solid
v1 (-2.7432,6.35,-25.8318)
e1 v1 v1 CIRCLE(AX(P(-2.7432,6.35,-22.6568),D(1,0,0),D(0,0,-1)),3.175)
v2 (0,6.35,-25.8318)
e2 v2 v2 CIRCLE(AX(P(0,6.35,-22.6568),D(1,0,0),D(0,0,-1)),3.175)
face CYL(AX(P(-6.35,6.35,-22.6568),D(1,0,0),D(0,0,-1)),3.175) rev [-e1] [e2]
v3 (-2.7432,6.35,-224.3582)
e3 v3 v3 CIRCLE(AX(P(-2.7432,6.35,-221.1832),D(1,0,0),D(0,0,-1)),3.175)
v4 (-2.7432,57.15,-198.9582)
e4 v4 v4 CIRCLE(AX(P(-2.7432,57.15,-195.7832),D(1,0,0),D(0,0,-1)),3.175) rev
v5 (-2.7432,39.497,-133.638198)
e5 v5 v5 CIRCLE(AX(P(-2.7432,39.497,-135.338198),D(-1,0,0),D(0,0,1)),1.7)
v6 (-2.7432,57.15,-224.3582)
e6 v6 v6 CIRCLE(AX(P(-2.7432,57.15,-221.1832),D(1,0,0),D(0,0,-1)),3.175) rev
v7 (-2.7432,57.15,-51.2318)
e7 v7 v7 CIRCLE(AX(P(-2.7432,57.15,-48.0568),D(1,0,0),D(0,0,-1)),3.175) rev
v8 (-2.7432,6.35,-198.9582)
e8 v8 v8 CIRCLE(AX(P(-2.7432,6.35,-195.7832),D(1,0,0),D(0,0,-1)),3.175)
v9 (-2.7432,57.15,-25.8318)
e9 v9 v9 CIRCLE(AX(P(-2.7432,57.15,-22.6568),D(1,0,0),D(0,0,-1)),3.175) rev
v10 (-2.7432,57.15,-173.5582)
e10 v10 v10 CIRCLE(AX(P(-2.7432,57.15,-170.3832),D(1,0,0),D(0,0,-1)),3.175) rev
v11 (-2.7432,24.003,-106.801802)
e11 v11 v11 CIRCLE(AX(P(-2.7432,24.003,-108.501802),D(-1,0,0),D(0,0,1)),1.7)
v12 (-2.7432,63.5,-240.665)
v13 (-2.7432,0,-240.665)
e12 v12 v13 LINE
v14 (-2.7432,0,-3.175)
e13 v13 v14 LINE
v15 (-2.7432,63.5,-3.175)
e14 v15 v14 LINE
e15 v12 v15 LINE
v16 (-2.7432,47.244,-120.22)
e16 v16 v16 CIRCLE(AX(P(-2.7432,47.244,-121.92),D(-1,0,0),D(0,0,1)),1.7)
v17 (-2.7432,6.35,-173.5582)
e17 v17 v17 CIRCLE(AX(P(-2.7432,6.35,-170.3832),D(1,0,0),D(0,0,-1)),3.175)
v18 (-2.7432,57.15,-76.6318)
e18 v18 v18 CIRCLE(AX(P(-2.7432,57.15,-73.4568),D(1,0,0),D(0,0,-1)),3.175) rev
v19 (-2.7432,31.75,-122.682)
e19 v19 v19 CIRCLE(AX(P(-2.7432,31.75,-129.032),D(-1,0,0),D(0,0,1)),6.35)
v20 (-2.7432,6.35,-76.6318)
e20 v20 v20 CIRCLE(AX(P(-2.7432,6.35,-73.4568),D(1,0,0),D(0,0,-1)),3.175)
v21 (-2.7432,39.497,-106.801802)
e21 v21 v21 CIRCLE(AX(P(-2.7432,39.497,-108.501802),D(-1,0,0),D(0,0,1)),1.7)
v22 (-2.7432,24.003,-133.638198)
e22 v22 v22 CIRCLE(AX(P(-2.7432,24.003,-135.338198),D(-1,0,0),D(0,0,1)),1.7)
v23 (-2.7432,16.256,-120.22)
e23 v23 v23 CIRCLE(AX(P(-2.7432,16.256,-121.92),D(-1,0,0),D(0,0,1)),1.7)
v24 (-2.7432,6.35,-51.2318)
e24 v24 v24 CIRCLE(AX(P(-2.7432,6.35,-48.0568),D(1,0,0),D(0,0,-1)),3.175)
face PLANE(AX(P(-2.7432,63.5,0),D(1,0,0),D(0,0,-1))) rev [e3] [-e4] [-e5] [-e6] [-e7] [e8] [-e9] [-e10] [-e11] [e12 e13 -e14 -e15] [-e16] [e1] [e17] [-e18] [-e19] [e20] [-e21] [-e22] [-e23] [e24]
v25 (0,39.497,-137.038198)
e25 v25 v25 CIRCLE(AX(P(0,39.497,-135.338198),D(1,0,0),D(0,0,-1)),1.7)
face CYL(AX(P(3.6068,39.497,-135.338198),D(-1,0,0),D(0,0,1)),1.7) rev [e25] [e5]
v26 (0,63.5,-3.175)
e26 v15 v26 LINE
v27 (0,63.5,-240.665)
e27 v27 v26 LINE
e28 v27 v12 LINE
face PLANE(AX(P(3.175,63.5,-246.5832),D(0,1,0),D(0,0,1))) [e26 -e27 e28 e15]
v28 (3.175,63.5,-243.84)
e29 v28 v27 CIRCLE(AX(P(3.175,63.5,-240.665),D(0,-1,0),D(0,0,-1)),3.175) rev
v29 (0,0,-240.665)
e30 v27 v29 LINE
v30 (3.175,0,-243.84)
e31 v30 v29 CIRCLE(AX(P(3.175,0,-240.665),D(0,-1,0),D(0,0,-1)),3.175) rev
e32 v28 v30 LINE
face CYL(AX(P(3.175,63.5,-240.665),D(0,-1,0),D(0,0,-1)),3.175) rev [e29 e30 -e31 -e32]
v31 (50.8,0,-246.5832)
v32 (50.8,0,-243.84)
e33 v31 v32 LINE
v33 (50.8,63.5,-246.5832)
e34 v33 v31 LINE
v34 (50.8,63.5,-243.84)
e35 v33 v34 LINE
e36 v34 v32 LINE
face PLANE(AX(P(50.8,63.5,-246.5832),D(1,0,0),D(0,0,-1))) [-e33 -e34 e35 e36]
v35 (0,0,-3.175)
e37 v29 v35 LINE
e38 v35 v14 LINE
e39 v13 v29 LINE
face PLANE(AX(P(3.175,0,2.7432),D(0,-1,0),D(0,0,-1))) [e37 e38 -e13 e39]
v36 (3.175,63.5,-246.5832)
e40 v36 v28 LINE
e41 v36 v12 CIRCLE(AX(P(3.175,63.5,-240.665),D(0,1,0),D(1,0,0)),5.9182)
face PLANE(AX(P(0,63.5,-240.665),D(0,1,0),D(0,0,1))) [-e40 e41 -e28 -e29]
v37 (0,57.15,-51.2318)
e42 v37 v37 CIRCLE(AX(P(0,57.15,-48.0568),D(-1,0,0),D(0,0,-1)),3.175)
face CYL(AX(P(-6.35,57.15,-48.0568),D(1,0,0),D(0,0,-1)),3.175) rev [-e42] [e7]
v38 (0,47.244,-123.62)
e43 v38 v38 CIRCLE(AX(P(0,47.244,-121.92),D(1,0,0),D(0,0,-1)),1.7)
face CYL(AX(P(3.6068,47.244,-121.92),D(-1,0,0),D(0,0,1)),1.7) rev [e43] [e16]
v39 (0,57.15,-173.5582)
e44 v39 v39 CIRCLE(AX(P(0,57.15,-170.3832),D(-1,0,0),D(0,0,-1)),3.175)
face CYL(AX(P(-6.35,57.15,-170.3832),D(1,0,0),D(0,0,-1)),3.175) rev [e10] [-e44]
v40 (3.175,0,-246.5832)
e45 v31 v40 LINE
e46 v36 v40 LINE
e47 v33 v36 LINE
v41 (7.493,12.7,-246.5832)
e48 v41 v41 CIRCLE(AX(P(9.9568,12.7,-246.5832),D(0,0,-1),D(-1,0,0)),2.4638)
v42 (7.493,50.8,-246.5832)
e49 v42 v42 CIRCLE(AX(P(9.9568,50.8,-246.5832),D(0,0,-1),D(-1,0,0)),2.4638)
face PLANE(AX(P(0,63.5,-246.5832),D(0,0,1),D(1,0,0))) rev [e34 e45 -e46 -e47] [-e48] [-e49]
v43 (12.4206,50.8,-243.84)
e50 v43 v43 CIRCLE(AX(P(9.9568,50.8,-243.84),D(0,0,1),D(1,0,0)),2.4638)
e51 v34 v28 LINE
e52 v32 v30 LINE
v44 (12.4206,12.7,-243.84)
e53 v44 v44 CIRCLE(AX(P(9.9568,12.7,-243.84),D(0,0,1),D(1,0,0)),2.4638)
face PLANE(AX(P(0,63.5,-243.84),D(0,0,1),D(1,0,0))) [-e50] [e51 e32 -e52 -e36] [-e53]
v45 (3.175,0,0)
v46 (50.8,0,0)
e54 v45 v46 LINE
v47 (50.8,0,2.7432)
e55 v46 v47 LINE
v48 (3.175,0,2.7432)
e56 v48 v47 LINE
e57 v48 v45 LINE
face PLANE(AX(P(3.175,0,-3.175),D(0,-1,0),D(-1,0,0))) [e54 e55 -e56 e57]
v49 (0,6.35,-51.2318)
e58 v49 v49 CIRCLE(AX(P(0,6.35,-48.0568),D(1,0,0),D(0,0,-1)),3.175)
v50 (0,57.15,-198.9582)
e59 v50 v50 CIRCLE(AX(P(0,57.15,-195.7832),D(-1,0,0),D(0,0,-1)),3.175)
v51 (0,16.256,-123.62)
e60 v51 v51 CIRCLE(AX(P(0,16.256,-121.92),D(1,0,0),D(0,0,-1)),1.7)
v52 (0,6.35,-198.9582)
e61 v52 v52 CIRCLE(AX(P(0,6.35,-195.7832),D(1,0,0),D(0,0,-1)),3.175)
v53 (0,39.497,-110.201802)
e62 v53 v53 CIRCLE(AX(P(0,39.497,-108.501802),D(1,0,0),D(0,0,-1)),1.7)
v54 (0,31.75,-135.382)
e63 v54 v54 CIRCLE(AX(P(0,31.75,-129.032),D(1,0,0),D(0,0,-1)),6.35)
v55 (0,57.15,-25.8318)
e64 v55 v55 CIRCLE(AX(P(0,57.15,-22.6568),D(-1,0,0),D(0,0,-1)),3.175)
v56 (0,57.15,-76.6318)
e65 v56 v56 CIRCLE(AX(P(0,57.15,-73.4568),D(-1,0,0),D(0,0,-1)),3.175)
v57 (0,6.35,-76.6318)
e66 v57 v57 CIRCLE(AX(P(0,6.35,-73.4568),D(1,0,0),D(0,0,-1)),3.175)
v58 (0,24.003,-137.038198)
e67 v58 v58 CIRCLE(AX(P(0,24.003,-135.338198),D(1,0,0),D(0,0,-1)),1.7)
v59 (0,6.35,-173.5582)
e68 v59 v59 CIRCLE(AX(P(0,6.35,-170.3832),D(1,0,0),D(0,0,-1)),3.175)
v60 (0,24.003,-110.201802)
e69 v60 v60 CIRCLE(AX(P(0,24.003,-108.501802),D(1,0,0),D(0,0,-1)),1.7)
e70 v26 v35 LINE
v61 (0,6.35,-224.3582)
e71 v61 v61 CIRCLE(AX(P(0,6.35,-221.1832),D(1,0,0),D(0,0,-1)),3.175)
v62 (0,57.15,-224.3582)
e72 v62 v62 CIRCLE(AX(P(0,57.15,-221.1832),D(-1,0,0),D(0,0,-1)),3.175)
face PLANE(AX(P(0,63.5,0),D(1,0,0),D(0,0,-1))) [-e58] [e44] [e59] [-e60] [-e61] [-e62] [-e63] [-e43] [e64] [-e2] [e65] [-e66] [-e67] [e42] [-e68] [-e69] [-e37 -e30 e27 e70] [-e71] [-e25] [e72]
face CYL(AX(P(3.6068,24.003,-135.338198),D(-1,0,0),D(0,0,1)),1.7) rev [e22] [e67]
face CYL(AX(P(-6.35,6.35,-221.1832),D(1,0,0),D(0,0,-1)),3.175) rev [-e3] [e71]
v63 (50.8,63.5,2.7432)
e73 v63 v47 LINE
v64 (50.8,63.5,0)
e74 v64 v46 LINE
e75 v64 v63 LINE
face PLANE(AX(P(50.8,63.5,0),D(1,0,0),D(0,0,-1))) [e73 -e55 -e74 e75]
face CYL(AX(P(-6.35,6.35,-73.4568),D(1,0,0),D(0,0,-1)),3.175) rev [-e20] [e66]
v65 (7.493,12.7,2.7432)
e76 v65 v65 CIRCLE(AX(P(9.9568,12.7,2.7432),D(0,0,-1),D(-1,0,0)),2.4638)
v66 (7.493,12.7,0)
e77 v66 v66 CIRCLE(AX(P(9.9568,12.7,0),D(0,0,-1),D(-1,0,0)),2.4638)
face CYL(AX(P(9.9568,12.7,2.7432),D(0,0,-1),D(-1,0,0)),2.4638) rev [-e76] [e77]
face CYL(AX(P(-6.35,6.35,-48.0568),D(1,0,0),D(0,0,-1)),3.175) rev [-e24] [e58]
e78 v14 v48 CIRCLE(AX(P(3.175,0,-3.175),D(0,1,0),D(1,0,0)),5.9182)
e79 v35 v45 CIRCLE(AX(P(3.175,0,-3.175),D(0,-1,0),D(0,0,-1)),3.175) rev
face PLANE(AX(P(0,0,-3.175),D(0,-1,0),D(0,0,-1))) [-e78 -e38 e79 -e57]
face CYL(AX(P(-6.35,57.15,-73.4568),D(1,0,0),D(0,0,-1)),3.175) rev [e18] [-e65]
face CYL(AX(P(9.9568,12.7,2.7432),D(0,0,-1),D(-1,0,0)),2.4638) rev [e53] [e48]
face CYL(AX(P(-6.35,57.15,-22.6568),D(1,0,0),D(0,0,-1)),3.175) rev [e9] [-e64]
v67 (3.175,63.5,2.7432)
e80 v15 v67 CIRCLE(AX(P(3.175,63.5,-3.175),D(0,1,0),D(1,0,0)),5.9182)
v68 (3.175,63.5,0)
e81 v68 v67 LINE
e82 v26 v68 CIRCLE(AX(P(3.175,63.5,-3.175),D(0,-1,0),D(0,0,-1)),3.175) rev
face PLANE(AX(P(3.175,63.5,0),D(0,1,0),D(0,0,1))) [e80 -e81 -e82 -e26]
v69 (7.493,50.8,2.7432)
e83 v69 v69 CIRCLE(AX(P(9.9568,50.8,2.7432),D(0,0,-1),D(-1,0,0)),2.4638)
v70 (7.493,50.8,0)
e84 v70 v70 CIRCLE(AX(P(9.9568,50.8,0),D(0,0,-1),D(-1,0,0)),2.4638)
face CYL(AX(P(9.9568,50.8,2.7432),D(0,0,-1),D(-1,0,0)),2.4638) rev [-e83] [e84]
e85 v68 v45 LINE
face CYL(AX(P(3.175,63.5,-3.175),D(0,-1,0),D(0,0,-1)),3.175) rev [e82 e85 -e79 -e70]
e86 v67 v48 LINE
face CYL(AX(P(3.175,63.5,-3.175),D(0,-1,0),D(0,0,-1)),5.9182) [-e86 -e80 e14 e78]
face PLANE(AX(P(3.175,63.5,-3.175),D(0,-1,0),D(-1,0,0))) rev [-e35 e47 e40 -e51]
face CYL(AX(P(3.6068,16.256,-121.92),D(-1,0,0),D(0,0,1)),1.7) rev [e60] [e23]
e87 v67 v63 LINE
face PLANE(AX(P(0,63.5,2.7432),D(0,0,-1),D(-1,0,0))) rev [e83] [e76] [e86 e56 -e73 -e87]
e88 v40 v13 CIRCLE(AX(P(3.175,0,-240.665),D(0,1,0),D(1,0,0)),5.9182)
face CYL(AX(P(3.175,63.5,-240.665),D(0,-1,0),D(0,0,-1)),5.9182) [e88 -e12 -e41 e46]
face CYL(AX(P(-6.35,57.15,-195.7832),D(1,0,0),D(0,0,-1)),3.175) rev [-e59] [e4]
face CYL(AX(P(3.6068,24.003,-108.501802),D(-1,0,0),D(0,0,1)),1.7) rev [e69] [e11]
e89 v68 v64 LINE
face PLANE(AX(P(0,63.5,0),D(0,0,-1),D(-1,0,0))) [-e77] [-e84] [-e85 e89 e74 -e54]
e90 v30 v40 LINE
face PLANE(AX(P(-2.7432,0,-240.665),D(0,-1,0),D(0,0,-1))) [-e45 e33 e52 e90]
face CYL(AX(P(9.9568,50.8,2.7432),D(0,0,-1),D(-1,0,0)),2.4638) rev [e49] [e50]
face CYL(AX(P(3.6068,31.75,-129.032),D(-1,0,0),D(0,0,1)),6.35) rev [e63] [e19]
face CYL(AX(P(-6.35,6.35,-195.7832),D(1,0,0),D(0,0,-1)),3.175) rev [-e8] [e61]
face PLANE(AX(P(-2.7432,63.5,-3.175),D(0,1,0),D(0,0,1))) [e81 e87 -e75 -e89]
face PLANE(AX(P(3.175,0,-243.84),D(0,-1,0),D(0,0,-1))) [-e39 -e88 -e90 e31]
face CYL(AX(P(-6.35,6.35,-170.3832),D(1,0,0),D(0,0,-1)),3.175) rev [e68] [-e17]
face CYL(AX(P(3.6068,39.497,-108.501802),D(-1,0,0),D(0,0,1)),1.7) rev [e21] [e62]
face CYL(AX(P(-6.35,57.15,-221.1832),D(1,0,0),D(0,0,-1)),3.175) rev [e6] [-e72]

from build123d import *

# Parameters (mm, degrees)
BASE_FLANGE1_DEPTH = 63.5
SKETCH8_R          = 2.4638
CUT_EXTRUDE2_DEPTH = 263.252824078
SKETCH9_R          = 3.175
CUT_EXTRUDE3_DEPTH = 6.35
SKETCH10_R         = 6.35
SKETCH10_R_2       = 1.7
CUT_EXTRUDE4_DEPTH = 6.35


# Sheet-metal steps are written as plain solids
with BuildPart() as part:
    # Sketch1 → Base-Flange1 (new body)
    with BuildSketch(Plane(origin=(0, 0, 0), x_dir=(1, 0, 0), z_dir=(0, 1, 0))):
        with BuildLine():
            Line((50.8, 0), (3.175, 0))
            ThreePointArc((3.175, 0), (0.92993597, 0.92993597), (0, 3.175))
            Line((0, 3.175), (0, 240.665))
            ThreePointArc((0, 240.665), (0.92993597, 242.91006403), (3.175, 243.84))
            Line((3.175, 243.84), (50.8, 243.84))
            Line((50.8, 243.84), (50.8, 246.5832))
            Line((50.8, 246.5832), (3.175, 246.5832))
            ThreePointArc((3.175, 246.5832), (-1.009799352, 244.849799352), (-2.7432, 240.665))
            Line((-2.7432, 240.665), (-2.7432, 3.175))
            ThreePointArc((-2.7432, 3.175), (-1.009799352, -1.009799352), (3.175, -2.7432))
            Line((3.175, -2.7432), (50.8, -2.7432))
            Line((50.8, -2.7432), (50.8, 0))
        make_face()
    extrude(amount=BASE_FLANGE1_DEPTH)

    # Sketch8 → Cut-Extrude2 (cut, through all)
    with BuildSketch(Plane(origin=(0, 0, -246.5832), x_dir=(-1, 0, 0), z_dir=(0, 0, -1))):
        with Locations((-9.9568, 12.7)):
            Circle(SKETCH8_R)
        with Locations((-9.9568, 50.8)):
            Circle(SKETCH8_R)
    extrude(amount=-CUT_EXTRUDE2_DEPTH, mode=Mode.SUBTRACT)

    # Sketch9 → Cut-Extrude3 (cut)
    with BuildSketch(Plane(origin=(0, 0, 0), x_dir=(0, 0, -1), z_dir=(1, 0, 0))):
        with Locations((221.1832, 6.35)):
            Circle(SKETCH9_R)
        with Locations((195.7832, 6.35)):
            Circle(SKETCH9_R)
        with Locations((170.3832, 6.35)):
            Circle(SKETCH9_R)
        with Locations((48.0568, 6.35)):
            Circle(SKETCH9_R)
        with Locations((22.6568, 6.35)):
            Circle(SKETCH9_R)
        with Locations((73.4568, 6.35)):
            Circle(SKETCH9_R)
    cut_extrude3 = extrude(amount=-CUT_EXTRUDE3_DEPTH, mode=Mode.SUBTRACT)

    # Mirror1: Cut-Extrude3 across plane
    add(cut_extrude3.mirror(Plane.ZX.offset(31.75)), mode=Mode.SUBTRACT)

    # Sketch10 → Cut-Extrude4 (cut)
    with BuildSketch(Plane.ZY.offset(2.7432)):
        with Locations((-129.032, 31.75)):
            Circle(SKETCH10_R)
        with Locations((-121.92, 16.256)):
            Circle(SKETCH10_R_2)
        with Locations((-135.338197606, 24.003)):
            Circle(SKETCH10_R_2)
        with Locations((-135.338197606, 39.497)):
            Circle(SKETCH10_R_2)
        with Locations((-121.92, 47.244)):
            Circle(SKETCH10_R_2)
        with Locations((-108.501802394, 39.497)):
            Circle(SKETCH10_R_2)
        with Locations((-108.501802394, 24.003)):
            Circle(SKETCH10_R_2)
    extrude(amount=-CUT_EXTRUDE4_DEPTH, mode=Mode.SUBTRACT)


solid = part.part
